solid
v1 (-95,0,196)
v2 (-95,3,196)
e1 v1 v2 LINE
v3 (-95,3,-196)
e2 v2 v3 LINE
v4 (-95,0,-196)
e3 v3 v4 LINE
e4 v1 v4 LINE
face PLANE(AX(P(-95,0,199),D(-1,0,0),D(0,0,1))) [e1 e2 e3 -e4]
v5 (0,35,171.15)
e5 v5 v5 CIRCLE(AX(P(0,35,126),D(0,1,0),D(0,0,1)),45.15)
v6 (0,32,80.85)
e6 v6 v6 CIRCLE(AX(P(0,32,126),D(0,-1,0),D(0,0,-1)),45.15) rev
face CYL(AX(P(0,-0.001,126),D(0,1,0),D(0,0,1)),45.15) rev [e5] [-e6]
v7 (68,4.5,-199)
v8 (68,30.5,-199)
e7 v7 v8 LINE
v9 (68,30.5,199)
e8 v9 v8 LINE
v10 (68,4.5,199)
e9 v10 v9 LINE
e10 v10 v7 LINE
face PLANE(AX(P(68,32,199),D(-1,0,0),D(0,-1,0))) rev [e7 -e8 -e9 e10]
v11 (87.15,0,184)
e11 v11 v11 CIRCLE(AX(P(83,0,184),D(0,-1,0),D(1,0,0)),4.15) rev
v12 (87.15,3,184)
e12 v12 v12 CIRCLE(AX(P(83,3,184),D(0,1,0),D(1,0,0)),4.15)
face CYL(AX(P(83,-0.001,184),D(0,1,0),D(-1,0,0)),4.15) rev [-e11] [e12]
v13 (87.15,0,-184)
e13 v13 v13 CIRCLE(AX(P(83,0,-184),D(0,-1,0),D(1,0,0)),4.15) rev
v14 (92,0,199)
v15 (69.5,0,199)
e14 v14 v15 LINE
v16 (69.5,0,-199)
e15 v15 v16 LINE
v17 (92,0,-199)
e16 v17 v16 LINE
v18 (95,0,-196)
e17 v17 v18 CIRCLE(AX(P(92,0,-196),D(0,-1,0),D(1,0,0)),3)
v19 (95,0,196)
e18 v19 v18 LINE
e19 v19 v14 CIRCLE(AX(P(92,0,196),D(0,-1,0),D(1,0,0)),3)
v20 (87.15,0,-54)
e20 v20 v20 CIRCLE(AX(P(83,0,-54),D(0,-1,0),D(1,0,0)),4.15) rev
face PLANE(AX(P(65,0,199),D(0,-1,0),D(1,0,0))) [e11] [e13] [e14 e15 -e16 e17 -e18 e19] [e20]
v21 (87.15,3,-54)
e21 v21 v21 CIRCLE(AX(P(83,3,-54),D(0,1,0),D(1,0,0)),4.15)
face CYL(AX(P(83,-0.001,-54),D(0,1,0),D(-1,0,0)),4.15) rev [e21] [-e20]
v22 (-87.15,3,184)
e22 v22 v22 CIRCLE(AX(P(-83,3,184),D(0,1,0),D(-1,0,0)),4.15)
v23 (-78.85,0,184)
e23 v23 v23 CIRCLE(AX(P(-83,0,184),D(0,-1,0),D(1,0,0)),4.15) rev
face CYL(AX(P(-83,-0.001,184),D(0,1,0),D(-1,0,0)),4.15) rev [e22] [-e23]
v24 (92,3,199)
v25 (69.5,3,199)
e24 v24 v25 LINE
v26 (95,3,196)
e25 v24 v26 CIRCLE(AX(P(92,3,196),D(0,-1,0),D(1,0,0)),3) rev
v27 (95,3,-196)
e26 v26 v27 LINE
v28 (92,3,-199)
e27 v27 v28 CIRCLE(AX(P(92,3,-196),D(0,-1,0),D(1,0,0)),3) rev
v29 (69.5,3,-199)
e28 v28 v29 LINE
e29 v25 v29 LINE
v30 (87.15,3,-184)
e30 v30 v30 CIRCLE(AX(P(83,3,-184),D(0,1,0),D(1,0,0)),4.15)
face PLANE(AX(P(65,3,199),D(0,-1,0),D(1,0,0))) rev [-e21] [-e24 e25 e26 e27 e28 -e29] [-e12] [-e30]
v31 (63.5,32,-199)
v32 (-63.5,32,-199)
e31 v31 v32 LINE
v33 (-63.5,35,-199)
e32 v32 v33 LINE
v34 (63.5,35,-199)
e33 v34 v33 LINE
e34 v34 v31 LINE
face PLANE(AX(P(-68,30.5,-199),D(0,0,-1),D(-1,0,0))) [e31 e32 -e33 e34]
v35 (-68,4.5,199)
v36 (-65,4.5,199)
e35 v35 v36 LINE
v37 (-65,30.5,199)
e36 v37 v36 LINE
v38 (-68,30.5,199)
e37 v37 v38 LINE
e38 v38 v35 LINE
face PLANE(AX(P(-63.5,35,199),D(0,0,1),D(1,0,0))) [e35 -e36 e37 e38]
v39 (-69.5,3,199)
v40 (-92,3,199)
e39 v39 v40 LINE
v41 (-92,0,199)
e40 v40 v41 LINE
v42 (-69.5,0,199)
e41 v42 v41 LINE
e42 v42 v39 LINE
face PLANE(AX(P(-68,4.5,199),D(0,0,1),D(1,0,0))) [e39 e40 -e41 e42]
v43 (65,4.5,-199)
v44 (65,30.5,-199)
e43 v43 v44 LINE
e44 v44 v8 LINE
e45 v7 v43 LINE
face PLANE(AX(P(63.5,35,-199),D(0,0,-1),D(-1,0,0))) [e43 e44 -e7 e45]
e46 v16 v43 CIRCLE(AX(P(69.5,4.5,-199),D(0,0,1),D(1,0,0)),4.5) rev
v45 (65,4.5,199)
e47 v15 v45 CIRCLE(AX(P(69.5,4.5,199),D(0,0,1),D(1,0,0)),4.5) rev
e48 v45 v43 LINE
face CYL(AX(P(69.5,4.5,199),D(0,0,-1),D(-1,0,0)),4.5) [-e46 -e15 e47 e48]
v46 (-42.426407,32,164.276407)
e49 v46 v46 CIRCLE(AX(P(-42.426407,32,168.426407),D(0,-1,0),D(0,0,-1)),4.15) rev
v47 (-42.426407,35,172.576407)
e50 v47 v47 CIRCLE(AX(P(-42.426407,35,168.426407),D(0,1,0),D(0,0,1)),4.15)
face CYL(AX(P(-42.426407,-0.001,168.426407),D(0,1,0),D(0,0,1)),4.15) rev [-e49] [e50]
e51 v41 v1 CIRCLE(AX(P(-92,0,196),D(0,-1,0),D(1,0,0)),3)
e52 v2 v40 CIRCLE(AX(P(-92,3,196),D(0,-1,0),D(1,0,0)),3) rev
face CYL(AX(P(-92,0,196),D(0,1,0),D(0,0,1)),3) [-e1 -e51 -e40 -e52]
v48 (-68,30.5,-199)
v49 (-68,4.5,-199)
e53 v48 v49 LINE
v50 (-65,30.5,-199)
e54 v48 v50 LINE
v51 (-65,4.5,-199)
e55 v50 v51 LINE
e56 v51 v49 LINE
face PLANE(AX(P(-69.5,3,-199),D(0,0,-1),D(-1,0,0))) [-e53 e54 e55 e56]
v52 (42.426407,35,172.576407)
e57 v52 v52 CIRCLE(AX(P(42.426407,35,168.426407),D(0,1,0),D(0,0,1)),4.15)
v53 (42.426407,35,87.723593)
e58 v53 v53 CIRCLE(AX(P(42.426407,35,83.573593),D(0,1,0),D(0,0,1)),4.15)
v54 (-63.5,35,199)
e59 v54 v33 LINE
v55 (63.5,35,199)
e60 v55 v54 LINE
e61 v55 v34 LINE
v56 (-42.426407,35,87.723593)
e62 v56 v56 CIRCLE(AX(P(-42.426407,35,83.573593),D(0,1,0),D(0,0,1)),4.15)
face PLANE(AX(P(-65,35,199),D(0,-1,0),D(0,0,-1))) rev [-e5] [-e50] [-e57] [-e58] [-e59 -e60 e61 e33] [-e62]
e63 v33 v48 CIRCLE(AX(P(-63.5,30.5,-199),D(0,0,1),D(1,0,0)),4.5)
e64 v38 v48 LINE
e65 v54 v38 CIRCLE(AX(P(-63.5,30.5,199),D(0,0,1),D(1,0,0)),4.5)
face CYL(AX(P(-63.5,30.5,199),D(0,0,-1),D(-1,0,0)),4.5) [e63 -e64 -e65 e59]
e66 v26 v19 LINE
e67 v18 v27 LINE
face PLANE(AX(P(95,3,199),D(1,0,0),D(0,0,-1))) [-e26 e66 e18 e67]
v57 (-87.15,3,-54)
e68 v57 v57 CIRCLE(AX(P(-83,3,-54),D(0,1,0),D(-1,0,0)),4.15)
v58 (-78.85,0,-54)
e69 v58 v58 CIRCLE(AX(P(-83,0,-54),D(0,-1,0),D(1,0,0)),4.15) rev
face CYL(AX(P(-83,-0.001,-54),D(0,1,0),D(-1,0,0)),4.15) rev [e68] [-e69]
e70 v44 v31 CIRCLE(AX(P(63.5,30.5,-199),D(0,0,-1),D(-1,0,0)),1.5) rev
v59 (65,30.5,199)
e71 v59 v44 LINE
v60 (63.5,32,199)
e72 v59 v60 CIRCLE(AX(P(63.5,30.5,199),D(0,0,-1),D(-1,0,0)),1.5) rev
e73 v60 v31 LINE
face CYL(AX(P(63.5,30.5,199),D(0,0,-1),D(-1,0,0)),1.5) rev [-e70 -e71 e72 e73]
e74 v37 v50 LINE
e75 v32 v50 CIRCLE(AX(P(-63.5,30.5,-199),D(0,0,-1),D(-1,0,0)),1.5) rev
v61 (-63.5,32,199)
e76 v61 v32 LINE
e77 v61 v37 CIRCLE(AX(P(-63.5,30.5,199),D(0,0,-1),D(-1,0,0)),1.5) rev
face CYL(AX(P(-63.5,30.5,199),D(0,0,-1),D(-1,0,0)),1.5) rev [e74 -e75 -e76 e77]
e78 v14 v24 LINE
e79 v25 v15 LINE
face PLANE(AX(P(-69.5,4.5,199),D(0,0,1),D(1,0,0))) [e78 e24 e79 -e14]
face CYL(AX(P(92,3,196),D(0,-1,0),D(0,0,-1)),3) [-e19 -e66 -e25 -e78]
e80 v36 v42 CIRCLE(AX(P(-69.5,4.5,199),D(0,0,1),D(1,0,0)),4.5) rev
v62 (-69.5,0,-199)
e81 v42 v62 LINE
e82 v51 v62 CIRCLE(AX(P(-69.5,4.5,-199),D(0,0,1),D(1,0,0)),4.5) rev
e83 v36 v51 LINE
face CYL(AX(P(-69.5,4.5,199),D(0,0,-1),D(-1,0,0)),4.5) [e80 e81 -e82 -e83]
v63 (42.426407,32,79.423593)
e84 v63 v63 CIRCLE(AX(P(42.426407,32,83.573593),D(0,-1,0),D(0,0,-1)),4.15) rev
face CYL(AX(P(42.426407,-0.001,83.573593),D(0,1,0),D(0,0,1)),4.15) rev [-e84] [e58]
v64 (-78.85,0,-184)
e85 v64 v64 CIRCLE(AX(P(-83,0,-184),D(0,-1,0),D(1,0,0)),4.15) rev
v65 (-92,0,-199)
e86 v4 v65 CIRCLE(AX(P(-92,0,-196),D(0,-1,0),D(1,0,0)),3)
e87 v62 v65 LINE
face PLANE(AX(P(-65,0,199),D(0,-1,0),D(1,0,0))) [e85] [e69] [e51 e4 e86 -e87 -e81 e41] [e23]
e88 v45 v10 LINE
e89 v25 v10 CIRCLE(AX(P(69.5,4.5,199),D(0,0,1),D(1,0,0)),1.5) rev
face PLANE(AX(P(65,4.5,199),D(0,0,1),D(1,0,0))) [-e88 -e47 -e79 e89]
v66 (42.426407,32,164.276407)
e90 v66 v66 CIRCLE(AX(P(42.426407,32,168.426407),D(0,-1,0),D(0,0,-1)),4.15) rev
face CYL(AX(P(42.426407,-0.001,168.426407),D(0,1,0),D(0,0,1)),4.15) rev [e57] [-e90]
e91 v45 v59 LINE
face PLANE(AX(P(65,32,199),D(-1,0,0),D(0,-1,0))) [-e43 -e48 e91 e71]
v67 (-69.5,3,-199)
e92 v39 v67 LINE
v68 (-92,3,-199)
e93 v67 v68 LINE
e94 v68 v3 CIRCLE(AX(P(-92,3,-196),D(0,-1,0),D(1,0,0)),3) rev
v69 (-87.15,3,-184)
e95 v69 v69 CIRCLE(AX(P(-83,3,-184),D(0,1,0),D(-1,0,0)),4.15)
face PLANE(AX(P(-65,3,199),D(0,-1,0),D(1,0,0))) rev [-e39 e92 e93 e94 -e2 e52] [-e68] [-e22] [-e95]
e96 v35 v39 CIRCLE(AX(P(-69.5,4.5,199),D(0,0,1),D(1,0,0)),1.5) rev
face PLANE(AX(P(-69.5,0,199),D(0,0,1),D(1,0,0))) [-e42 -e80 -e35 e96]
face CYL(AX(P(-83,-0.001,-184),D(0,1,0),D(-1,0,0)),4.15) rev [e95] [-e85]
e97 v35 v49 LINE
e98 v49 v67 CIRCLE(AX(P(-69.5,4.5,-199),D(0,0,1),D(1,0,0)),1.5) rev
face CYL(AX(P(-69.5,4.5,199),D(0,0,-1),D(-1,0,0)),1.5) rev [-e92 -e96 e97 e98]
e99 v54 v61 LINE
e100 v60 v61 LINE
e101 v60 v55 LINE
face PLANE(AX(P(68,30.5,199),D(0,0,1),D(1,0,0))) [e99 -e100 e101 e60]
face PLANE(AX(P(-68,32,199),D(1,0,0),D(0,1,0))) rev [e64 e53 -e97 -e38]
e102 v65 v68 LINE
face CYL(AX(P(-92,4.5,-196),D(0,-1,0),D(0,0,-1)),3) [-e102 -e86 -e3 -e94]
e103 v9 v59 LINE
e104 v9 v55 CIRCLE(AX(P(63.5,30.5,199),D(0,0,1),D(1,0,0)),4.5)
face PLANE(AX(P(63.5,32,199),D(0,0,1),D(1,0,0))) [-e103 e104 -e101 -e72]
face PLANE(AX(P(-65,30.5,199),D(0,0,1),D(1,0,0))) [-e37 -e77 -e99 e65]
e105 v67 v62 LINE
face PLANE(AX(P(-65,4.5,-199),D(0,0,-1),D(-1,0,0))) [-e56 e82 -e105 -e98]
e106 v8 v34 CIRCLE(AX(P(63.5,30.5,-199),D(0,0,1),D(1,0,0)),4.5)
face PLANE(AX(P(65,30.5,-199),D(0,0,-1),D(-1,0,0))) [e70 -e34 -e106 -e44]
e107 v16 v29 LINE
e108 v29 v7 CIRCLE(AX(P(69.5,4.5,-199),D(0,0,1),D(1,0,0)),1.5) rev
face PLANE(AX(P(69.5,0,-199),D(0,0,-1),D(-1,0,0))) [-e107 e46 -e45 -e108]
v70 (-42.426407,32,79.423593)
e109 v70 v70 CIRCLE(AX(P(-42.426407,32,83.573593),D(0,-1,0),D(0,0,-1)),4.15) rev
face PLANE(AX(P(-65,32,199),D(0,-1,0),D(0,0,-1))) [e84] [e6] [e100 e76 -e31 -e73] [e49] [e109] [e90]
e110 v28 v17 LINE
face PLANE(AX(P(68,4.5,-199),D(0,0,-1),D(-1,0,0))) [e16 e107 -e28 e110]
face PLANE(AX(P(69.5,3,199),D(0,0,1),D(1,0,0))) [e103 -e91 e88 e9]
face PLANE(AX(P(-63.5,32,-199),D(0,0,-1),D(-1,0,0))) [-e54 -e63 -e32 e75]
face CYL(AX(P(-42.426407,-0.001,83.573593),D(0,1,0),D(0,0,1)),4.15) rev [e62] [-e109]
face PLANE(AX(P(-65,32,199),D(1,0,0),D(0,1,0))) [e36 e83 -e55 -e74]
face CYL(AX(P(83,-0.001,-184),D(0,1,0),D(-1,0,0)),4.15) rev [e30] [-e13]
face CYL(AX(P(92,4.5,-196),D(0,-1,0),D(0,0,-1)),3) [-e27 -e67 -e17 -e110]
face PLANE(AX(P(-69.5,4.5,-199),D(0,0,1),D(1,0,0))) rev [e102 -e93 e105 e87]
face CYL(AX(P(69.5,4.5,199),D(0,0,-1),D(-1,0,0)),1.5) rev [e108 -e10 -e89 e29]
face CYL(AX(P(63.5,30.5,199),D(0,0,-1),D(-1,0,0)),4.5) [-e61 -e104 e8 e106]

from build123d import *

# Parameters (mm, degrees)
BASE_FLANGE1_DEPTH = 199
CUT_EXTRUDE1_REACH = 224.823
SKETCH6_R          = 4.15
FILLET1_R          = 3
CUT_EXTRUDE2_REACH = 225.273
SKETCH8_R          = 45.15
SKETCH8_R_2        = 4.15


# Sheet-metal steps are written as plain solids
with BuildPart() as part:
    # Sketch1 → Base-Flange1 (new, symmetric)
    with BuildSketch(Plane.XY):
        with BuildLine():
            Line((-95, 0), (-69.5, 0))
            ThreePointArc((-69.5, 0), (-66.318019485, 1.318019485), (-65, 4.5))
            Line((-65, 4.5), (-65, 30.5))
            ThreePointArc((-65, 30.5), (-64.560660172, 31.560660172), (-63.5, 32))
            Line((-63.5, 32), (63.5, 32))
            ThreePointArc((63.5, 32), (64.560660172, 31.560660172), (65, 30.5))
            Line((65, 30.5), (65, 4.5))
            ThreePointArc((65, 4.5), (66.318019485, 1.318019485), (69.5, 0))
            Line((69.5, 0), (95, 0))
            Line((95, 0), (95, 3))
            Line((95, 3), (69.5, 3))
            ThreePointArc((69.5, 3), (68.439339828, 3.439339828), (68, 4.5))
            Line((68, 4.5), (68, 30.5))
            ThreePointArc((68, 30.5), (66.681980515, 33.681980515), (63.5, 35))
            Line((63.5, 35), (-63.5, 35))
            ThreePointArc((-63.5, 35), (-66.681980515, 33.681980515), (-68, 30.5))
            Line((-68, 30.5), (-68, 4.5))
            ThreePointArc((-68, 4.5), (-68.439339828, 3.439339828), (-69.5, 3))
            Line((-69.5, 3), (-95, 3))
            Line((-95, 3), (-95, 0))
        make_face()
    extrude(amount=BASE_FLANGE1_DEPTH, both=True)

    # Sketch6 → Cut-Extrude1 (cut, up to next)
    with BuildSketch(Plane(origin=(0, 3, 0), x_dir=(1, 0, 0), z_dir=(0, 1, 0)), mode=Mode.PRIVATE) as cut_extrude1_sk1:
        with Locations(Location((-83, -184, 0), (0, 0, 180))):
            Circle(SKETCH6_R)
    cut_extrude1_tool1 = extrude(cut_extrude1_sk1.sketch, amount=-CUT_EXTRUDE1_REACH, mode=Mode.PRIVATE) & part.part
    # Sketch6 → Cut-Extrude1 (cut, up to next)
    with BuildSketch(Plane(origin=(0, 3, 0), x_dir=(1, 0, 0), z_dir=(0, 1, 0)), mode=Mode.PRIVATE) as cut_extrude1_sk2:
        with Locations(Location((-83, 54, 0), (0, 0, 180))):
            Circle(SKETCH6_R)
    cut_extrude1_tool2 = extrude(cut_extrude1_sk2.sketch, amount=-CUT_EXTRUDE1_REACH, mode=Mode.PRIVATE) & part.part
    # Sketch6 → Cut-Extrude1 (cut, up to next)
    with BuildSketch(Plane(origin=(0, 3, 0), x_dir=(1, 0, 0), z_dir=(0, 1, 0)), mode=Mode.PRIVATE) as cut_extrude1_sk3:
        with Locations(Location((-83, 184, 0), (0, 0, 180))):
            Circle(SKETCH6_R)
    cut_extrude1_tool3 = extrude(cut_extrude1_sk3.sketch, amount=-CUT_EXTRUDE1_REACH, mode=Mode.PRIVATE) & part.part
    # Sketch6 → Cut-Extrude1 (cut, up to next)
    with BuildSketch(Plane(origin=(0, 3, 0), x_dir=(1, 0, 0), z_dir=(0, 1, 0)), mode=Mode.PRIVATE) as cut_extrude1_sk4:
        with Locations((83, 184)):
            Circle(SKETCH6_R)
    cut_extrude1_tool4 = extrude(cut_extrude1_sk4.sketch, amount=-CUT_EXTRUDE1_REACH, mode=Mode.PRIVATE) & part.part
    # Sketch6 → Cut-Extrude1 (cut, up to next)
    with BuildSketch(Plane(origin=(0, 3, 0), x_dir=(1, 0, 0), z_dir=(0, 1, 0)), mode=Mode.PRIVATE) as cut_extrude1_sk5:
        with Locations((83, 54)):
            Circle(SKETCH6_R)
    cut_extrude1_tool5 = extrude(cut_extrude1_sk5.sketch, amount=-CUT_EXTRUDE1_REACH, mode=Mode.PRIVATE) & part.part
    # Sketch6 → Cut-Extrude1 (cut, up to next)
    with BuildSketch(Plane(origin=(0, 3, 0), x_dir=(1, 0, 0), z_dir=(0, 1, 0)), mode=Mode.PRIVATE) as cut_extrude1_sk6:
        with Locations((83, -184)):
            Circle(SKETCH6_R)
    cut_extrude1_tool6 = extrude(cut_extrude1_sk6.sketch, amount=-CUT_EXTRUDE1_REACH, mode=Mode.PRIVATE) & part.part
    add(cut_extrude1_tool1.solids().sort_by_distance((-83, 3, 184))[0], mode=Mode.SUBTRACT)
    add(cut_extrude1_tool2.solids().sort_by_distance((-83, 3, -54))[0], mode=Mode.SUBTRACT)
    add(cut_extrude1_tool3.solids().sort_by_distance((-83, 3, -184))[0], mode=Mode.SUBTRACT)
    add(cut_extrude1_tool4.solids().sort_by_distance((83, 3, -184))[0], mode=Mode.SUBTRACT)
    add(cut_extrude1_tool5.solids().sort_by_distance((83, 3, -54))[0], mode=Mode.SUBTRACT)
    add(cut_extrude1_tool6.solids().sort_by_distance((83, 3, 184))[0], mode=Mode.SUBTRACT)

    # Fillet1
    fillet1_edges = [part.edges().sort_by_distance(p)[0] for p in [
        (95, 1.5, -199),
        (-95, 1.5, -199),
        (95, 1.5, 199),
        (-95, 1.5, 199),
    ]]
    fillet(fillet1_edges, radius=FILLET1_R)

    # Sketch8 → Cut-Extrude2 (cut, up to next)
    with BuildSketch(Plane(origin=(0, 35, 0), x_dir=(1, 0, 0), z_dir=(0, 1, 0)), mode=Mode.PRIVATE) as cut_extrude2_sk1:
        with Locations(Location((0, -126, 0), (0, 0, 270))):
            Circle(SKETCH8_R)
    cut_extrude2_tool1 = extrude(cut_extrude2_sk1.sketch, amount=-CUT_EXTRUDE2_REACH, mode=Mode.PRIVATE) & part.part
    # Sketch8 → Cut-Extrude2 (cut, up to next)
    with BuildSketch(Plane(origin=(0, 35, 0), x_dir=(1, 0, 0), z_dir=(0, 1, 0)), mode=Mode.PRIVATE) as cut_extrude2_sk2:
        with Locations(Location((-42.426406871, -83.573593129, 0), (0, 0, 270))):
            Circle(SKETCH8_R_2)
    cut_extrude2_tool2 = extrude(cut_extrude2_sk2.sketch, amount=-CUT_EXTRUDE2_REACH, mode=Mode.PRIVATE) & part.part
    # Sketch8 → Cut-Extrude2 (cut, up to next)
    with BuildSketch(Plane(origin=(0, 35, 0), x_dir=(1, 0, 0), z_dir=(0, 1, 0)), mode=Mode.PRIVATE) as cut_extrude2_sk3:
        with Locations(Location((42.426406871, -83.573593129, 0), (0, 0, 270))):
            Circle(SKETCH8_R_2)
    cut_extrude2_tool3 = extrude(cut_extrude2_sk3.sketch, amount=-CUT_EXTRUDE2_REACH, mode=Mode.PRIVATE) & part.part
    # Sketch8 → Cut-Extrude2 (cut, up to next)
    with BuildSketch(Plane(origin=(0, 35, 0), x_dir=(1, 0, 0), z_dir=(0, 1, 0)), mode=Mode.PRIVATE) as cut_extrude2_sk4:
        with Locations(Location((42.426406871, -168.426406871, 0), (0, 0, 270))):
            Circle(SKETCH8_R_2)
    cut_extrude2_tool4 = extrude(cut_extrude2_sk4.sketch, amount=-CUT_EXTRUDE2_REACH, mode=Mode.PRIVATE) & part.part
    # Sketch8 → Cut-Extrude2 (cut, up to next)
    with BuildSketch(Plane(origin=(0, 35, 0), x_dir=(1, 0, 0), z_dir=(0, 1, 0)), mode=Mode.PRIVATE) as cut_extrude2_sk5:
        with Locations(Location((-42.426406871, -168.426406871, 0), (0, 0, 270))):
            Circle(SKETCH8_R_2)
    cut_extrude2_tool5 = extrude(cut_extrude2_sk5.sketch, amount=-CUT_EXTRUDE2_REACH, mode=Mode.PRIVATE) & part.part
    add(cut_extrude2_tool1.solids().sort_by_distance((0, 35, 126))[0], mode=Mode.SUBTRACT)
    add(cut_extrude2_tool2.solids().sort_by_distance((-42.426407, 35, 83.573593))[0], mode=Mode.SUBTRACT)
    add(cut_extrude2_tool3.solids().sort_by_distance((42.426407, 35, 83.573593))[0], mode=Mode.SUBTRACT)
    add(cut_extrude2_tool4.solids().sort_by_distance((42.426407, 35, 168.426407))[0], mode=Mode.SUBTRACT)
    add(cut_extrude2_tool5.solids().sort_by_distance((-42.426407, 35, 168.426407))[0], mode=Mode.SUBTRACT)


solid = part.part
